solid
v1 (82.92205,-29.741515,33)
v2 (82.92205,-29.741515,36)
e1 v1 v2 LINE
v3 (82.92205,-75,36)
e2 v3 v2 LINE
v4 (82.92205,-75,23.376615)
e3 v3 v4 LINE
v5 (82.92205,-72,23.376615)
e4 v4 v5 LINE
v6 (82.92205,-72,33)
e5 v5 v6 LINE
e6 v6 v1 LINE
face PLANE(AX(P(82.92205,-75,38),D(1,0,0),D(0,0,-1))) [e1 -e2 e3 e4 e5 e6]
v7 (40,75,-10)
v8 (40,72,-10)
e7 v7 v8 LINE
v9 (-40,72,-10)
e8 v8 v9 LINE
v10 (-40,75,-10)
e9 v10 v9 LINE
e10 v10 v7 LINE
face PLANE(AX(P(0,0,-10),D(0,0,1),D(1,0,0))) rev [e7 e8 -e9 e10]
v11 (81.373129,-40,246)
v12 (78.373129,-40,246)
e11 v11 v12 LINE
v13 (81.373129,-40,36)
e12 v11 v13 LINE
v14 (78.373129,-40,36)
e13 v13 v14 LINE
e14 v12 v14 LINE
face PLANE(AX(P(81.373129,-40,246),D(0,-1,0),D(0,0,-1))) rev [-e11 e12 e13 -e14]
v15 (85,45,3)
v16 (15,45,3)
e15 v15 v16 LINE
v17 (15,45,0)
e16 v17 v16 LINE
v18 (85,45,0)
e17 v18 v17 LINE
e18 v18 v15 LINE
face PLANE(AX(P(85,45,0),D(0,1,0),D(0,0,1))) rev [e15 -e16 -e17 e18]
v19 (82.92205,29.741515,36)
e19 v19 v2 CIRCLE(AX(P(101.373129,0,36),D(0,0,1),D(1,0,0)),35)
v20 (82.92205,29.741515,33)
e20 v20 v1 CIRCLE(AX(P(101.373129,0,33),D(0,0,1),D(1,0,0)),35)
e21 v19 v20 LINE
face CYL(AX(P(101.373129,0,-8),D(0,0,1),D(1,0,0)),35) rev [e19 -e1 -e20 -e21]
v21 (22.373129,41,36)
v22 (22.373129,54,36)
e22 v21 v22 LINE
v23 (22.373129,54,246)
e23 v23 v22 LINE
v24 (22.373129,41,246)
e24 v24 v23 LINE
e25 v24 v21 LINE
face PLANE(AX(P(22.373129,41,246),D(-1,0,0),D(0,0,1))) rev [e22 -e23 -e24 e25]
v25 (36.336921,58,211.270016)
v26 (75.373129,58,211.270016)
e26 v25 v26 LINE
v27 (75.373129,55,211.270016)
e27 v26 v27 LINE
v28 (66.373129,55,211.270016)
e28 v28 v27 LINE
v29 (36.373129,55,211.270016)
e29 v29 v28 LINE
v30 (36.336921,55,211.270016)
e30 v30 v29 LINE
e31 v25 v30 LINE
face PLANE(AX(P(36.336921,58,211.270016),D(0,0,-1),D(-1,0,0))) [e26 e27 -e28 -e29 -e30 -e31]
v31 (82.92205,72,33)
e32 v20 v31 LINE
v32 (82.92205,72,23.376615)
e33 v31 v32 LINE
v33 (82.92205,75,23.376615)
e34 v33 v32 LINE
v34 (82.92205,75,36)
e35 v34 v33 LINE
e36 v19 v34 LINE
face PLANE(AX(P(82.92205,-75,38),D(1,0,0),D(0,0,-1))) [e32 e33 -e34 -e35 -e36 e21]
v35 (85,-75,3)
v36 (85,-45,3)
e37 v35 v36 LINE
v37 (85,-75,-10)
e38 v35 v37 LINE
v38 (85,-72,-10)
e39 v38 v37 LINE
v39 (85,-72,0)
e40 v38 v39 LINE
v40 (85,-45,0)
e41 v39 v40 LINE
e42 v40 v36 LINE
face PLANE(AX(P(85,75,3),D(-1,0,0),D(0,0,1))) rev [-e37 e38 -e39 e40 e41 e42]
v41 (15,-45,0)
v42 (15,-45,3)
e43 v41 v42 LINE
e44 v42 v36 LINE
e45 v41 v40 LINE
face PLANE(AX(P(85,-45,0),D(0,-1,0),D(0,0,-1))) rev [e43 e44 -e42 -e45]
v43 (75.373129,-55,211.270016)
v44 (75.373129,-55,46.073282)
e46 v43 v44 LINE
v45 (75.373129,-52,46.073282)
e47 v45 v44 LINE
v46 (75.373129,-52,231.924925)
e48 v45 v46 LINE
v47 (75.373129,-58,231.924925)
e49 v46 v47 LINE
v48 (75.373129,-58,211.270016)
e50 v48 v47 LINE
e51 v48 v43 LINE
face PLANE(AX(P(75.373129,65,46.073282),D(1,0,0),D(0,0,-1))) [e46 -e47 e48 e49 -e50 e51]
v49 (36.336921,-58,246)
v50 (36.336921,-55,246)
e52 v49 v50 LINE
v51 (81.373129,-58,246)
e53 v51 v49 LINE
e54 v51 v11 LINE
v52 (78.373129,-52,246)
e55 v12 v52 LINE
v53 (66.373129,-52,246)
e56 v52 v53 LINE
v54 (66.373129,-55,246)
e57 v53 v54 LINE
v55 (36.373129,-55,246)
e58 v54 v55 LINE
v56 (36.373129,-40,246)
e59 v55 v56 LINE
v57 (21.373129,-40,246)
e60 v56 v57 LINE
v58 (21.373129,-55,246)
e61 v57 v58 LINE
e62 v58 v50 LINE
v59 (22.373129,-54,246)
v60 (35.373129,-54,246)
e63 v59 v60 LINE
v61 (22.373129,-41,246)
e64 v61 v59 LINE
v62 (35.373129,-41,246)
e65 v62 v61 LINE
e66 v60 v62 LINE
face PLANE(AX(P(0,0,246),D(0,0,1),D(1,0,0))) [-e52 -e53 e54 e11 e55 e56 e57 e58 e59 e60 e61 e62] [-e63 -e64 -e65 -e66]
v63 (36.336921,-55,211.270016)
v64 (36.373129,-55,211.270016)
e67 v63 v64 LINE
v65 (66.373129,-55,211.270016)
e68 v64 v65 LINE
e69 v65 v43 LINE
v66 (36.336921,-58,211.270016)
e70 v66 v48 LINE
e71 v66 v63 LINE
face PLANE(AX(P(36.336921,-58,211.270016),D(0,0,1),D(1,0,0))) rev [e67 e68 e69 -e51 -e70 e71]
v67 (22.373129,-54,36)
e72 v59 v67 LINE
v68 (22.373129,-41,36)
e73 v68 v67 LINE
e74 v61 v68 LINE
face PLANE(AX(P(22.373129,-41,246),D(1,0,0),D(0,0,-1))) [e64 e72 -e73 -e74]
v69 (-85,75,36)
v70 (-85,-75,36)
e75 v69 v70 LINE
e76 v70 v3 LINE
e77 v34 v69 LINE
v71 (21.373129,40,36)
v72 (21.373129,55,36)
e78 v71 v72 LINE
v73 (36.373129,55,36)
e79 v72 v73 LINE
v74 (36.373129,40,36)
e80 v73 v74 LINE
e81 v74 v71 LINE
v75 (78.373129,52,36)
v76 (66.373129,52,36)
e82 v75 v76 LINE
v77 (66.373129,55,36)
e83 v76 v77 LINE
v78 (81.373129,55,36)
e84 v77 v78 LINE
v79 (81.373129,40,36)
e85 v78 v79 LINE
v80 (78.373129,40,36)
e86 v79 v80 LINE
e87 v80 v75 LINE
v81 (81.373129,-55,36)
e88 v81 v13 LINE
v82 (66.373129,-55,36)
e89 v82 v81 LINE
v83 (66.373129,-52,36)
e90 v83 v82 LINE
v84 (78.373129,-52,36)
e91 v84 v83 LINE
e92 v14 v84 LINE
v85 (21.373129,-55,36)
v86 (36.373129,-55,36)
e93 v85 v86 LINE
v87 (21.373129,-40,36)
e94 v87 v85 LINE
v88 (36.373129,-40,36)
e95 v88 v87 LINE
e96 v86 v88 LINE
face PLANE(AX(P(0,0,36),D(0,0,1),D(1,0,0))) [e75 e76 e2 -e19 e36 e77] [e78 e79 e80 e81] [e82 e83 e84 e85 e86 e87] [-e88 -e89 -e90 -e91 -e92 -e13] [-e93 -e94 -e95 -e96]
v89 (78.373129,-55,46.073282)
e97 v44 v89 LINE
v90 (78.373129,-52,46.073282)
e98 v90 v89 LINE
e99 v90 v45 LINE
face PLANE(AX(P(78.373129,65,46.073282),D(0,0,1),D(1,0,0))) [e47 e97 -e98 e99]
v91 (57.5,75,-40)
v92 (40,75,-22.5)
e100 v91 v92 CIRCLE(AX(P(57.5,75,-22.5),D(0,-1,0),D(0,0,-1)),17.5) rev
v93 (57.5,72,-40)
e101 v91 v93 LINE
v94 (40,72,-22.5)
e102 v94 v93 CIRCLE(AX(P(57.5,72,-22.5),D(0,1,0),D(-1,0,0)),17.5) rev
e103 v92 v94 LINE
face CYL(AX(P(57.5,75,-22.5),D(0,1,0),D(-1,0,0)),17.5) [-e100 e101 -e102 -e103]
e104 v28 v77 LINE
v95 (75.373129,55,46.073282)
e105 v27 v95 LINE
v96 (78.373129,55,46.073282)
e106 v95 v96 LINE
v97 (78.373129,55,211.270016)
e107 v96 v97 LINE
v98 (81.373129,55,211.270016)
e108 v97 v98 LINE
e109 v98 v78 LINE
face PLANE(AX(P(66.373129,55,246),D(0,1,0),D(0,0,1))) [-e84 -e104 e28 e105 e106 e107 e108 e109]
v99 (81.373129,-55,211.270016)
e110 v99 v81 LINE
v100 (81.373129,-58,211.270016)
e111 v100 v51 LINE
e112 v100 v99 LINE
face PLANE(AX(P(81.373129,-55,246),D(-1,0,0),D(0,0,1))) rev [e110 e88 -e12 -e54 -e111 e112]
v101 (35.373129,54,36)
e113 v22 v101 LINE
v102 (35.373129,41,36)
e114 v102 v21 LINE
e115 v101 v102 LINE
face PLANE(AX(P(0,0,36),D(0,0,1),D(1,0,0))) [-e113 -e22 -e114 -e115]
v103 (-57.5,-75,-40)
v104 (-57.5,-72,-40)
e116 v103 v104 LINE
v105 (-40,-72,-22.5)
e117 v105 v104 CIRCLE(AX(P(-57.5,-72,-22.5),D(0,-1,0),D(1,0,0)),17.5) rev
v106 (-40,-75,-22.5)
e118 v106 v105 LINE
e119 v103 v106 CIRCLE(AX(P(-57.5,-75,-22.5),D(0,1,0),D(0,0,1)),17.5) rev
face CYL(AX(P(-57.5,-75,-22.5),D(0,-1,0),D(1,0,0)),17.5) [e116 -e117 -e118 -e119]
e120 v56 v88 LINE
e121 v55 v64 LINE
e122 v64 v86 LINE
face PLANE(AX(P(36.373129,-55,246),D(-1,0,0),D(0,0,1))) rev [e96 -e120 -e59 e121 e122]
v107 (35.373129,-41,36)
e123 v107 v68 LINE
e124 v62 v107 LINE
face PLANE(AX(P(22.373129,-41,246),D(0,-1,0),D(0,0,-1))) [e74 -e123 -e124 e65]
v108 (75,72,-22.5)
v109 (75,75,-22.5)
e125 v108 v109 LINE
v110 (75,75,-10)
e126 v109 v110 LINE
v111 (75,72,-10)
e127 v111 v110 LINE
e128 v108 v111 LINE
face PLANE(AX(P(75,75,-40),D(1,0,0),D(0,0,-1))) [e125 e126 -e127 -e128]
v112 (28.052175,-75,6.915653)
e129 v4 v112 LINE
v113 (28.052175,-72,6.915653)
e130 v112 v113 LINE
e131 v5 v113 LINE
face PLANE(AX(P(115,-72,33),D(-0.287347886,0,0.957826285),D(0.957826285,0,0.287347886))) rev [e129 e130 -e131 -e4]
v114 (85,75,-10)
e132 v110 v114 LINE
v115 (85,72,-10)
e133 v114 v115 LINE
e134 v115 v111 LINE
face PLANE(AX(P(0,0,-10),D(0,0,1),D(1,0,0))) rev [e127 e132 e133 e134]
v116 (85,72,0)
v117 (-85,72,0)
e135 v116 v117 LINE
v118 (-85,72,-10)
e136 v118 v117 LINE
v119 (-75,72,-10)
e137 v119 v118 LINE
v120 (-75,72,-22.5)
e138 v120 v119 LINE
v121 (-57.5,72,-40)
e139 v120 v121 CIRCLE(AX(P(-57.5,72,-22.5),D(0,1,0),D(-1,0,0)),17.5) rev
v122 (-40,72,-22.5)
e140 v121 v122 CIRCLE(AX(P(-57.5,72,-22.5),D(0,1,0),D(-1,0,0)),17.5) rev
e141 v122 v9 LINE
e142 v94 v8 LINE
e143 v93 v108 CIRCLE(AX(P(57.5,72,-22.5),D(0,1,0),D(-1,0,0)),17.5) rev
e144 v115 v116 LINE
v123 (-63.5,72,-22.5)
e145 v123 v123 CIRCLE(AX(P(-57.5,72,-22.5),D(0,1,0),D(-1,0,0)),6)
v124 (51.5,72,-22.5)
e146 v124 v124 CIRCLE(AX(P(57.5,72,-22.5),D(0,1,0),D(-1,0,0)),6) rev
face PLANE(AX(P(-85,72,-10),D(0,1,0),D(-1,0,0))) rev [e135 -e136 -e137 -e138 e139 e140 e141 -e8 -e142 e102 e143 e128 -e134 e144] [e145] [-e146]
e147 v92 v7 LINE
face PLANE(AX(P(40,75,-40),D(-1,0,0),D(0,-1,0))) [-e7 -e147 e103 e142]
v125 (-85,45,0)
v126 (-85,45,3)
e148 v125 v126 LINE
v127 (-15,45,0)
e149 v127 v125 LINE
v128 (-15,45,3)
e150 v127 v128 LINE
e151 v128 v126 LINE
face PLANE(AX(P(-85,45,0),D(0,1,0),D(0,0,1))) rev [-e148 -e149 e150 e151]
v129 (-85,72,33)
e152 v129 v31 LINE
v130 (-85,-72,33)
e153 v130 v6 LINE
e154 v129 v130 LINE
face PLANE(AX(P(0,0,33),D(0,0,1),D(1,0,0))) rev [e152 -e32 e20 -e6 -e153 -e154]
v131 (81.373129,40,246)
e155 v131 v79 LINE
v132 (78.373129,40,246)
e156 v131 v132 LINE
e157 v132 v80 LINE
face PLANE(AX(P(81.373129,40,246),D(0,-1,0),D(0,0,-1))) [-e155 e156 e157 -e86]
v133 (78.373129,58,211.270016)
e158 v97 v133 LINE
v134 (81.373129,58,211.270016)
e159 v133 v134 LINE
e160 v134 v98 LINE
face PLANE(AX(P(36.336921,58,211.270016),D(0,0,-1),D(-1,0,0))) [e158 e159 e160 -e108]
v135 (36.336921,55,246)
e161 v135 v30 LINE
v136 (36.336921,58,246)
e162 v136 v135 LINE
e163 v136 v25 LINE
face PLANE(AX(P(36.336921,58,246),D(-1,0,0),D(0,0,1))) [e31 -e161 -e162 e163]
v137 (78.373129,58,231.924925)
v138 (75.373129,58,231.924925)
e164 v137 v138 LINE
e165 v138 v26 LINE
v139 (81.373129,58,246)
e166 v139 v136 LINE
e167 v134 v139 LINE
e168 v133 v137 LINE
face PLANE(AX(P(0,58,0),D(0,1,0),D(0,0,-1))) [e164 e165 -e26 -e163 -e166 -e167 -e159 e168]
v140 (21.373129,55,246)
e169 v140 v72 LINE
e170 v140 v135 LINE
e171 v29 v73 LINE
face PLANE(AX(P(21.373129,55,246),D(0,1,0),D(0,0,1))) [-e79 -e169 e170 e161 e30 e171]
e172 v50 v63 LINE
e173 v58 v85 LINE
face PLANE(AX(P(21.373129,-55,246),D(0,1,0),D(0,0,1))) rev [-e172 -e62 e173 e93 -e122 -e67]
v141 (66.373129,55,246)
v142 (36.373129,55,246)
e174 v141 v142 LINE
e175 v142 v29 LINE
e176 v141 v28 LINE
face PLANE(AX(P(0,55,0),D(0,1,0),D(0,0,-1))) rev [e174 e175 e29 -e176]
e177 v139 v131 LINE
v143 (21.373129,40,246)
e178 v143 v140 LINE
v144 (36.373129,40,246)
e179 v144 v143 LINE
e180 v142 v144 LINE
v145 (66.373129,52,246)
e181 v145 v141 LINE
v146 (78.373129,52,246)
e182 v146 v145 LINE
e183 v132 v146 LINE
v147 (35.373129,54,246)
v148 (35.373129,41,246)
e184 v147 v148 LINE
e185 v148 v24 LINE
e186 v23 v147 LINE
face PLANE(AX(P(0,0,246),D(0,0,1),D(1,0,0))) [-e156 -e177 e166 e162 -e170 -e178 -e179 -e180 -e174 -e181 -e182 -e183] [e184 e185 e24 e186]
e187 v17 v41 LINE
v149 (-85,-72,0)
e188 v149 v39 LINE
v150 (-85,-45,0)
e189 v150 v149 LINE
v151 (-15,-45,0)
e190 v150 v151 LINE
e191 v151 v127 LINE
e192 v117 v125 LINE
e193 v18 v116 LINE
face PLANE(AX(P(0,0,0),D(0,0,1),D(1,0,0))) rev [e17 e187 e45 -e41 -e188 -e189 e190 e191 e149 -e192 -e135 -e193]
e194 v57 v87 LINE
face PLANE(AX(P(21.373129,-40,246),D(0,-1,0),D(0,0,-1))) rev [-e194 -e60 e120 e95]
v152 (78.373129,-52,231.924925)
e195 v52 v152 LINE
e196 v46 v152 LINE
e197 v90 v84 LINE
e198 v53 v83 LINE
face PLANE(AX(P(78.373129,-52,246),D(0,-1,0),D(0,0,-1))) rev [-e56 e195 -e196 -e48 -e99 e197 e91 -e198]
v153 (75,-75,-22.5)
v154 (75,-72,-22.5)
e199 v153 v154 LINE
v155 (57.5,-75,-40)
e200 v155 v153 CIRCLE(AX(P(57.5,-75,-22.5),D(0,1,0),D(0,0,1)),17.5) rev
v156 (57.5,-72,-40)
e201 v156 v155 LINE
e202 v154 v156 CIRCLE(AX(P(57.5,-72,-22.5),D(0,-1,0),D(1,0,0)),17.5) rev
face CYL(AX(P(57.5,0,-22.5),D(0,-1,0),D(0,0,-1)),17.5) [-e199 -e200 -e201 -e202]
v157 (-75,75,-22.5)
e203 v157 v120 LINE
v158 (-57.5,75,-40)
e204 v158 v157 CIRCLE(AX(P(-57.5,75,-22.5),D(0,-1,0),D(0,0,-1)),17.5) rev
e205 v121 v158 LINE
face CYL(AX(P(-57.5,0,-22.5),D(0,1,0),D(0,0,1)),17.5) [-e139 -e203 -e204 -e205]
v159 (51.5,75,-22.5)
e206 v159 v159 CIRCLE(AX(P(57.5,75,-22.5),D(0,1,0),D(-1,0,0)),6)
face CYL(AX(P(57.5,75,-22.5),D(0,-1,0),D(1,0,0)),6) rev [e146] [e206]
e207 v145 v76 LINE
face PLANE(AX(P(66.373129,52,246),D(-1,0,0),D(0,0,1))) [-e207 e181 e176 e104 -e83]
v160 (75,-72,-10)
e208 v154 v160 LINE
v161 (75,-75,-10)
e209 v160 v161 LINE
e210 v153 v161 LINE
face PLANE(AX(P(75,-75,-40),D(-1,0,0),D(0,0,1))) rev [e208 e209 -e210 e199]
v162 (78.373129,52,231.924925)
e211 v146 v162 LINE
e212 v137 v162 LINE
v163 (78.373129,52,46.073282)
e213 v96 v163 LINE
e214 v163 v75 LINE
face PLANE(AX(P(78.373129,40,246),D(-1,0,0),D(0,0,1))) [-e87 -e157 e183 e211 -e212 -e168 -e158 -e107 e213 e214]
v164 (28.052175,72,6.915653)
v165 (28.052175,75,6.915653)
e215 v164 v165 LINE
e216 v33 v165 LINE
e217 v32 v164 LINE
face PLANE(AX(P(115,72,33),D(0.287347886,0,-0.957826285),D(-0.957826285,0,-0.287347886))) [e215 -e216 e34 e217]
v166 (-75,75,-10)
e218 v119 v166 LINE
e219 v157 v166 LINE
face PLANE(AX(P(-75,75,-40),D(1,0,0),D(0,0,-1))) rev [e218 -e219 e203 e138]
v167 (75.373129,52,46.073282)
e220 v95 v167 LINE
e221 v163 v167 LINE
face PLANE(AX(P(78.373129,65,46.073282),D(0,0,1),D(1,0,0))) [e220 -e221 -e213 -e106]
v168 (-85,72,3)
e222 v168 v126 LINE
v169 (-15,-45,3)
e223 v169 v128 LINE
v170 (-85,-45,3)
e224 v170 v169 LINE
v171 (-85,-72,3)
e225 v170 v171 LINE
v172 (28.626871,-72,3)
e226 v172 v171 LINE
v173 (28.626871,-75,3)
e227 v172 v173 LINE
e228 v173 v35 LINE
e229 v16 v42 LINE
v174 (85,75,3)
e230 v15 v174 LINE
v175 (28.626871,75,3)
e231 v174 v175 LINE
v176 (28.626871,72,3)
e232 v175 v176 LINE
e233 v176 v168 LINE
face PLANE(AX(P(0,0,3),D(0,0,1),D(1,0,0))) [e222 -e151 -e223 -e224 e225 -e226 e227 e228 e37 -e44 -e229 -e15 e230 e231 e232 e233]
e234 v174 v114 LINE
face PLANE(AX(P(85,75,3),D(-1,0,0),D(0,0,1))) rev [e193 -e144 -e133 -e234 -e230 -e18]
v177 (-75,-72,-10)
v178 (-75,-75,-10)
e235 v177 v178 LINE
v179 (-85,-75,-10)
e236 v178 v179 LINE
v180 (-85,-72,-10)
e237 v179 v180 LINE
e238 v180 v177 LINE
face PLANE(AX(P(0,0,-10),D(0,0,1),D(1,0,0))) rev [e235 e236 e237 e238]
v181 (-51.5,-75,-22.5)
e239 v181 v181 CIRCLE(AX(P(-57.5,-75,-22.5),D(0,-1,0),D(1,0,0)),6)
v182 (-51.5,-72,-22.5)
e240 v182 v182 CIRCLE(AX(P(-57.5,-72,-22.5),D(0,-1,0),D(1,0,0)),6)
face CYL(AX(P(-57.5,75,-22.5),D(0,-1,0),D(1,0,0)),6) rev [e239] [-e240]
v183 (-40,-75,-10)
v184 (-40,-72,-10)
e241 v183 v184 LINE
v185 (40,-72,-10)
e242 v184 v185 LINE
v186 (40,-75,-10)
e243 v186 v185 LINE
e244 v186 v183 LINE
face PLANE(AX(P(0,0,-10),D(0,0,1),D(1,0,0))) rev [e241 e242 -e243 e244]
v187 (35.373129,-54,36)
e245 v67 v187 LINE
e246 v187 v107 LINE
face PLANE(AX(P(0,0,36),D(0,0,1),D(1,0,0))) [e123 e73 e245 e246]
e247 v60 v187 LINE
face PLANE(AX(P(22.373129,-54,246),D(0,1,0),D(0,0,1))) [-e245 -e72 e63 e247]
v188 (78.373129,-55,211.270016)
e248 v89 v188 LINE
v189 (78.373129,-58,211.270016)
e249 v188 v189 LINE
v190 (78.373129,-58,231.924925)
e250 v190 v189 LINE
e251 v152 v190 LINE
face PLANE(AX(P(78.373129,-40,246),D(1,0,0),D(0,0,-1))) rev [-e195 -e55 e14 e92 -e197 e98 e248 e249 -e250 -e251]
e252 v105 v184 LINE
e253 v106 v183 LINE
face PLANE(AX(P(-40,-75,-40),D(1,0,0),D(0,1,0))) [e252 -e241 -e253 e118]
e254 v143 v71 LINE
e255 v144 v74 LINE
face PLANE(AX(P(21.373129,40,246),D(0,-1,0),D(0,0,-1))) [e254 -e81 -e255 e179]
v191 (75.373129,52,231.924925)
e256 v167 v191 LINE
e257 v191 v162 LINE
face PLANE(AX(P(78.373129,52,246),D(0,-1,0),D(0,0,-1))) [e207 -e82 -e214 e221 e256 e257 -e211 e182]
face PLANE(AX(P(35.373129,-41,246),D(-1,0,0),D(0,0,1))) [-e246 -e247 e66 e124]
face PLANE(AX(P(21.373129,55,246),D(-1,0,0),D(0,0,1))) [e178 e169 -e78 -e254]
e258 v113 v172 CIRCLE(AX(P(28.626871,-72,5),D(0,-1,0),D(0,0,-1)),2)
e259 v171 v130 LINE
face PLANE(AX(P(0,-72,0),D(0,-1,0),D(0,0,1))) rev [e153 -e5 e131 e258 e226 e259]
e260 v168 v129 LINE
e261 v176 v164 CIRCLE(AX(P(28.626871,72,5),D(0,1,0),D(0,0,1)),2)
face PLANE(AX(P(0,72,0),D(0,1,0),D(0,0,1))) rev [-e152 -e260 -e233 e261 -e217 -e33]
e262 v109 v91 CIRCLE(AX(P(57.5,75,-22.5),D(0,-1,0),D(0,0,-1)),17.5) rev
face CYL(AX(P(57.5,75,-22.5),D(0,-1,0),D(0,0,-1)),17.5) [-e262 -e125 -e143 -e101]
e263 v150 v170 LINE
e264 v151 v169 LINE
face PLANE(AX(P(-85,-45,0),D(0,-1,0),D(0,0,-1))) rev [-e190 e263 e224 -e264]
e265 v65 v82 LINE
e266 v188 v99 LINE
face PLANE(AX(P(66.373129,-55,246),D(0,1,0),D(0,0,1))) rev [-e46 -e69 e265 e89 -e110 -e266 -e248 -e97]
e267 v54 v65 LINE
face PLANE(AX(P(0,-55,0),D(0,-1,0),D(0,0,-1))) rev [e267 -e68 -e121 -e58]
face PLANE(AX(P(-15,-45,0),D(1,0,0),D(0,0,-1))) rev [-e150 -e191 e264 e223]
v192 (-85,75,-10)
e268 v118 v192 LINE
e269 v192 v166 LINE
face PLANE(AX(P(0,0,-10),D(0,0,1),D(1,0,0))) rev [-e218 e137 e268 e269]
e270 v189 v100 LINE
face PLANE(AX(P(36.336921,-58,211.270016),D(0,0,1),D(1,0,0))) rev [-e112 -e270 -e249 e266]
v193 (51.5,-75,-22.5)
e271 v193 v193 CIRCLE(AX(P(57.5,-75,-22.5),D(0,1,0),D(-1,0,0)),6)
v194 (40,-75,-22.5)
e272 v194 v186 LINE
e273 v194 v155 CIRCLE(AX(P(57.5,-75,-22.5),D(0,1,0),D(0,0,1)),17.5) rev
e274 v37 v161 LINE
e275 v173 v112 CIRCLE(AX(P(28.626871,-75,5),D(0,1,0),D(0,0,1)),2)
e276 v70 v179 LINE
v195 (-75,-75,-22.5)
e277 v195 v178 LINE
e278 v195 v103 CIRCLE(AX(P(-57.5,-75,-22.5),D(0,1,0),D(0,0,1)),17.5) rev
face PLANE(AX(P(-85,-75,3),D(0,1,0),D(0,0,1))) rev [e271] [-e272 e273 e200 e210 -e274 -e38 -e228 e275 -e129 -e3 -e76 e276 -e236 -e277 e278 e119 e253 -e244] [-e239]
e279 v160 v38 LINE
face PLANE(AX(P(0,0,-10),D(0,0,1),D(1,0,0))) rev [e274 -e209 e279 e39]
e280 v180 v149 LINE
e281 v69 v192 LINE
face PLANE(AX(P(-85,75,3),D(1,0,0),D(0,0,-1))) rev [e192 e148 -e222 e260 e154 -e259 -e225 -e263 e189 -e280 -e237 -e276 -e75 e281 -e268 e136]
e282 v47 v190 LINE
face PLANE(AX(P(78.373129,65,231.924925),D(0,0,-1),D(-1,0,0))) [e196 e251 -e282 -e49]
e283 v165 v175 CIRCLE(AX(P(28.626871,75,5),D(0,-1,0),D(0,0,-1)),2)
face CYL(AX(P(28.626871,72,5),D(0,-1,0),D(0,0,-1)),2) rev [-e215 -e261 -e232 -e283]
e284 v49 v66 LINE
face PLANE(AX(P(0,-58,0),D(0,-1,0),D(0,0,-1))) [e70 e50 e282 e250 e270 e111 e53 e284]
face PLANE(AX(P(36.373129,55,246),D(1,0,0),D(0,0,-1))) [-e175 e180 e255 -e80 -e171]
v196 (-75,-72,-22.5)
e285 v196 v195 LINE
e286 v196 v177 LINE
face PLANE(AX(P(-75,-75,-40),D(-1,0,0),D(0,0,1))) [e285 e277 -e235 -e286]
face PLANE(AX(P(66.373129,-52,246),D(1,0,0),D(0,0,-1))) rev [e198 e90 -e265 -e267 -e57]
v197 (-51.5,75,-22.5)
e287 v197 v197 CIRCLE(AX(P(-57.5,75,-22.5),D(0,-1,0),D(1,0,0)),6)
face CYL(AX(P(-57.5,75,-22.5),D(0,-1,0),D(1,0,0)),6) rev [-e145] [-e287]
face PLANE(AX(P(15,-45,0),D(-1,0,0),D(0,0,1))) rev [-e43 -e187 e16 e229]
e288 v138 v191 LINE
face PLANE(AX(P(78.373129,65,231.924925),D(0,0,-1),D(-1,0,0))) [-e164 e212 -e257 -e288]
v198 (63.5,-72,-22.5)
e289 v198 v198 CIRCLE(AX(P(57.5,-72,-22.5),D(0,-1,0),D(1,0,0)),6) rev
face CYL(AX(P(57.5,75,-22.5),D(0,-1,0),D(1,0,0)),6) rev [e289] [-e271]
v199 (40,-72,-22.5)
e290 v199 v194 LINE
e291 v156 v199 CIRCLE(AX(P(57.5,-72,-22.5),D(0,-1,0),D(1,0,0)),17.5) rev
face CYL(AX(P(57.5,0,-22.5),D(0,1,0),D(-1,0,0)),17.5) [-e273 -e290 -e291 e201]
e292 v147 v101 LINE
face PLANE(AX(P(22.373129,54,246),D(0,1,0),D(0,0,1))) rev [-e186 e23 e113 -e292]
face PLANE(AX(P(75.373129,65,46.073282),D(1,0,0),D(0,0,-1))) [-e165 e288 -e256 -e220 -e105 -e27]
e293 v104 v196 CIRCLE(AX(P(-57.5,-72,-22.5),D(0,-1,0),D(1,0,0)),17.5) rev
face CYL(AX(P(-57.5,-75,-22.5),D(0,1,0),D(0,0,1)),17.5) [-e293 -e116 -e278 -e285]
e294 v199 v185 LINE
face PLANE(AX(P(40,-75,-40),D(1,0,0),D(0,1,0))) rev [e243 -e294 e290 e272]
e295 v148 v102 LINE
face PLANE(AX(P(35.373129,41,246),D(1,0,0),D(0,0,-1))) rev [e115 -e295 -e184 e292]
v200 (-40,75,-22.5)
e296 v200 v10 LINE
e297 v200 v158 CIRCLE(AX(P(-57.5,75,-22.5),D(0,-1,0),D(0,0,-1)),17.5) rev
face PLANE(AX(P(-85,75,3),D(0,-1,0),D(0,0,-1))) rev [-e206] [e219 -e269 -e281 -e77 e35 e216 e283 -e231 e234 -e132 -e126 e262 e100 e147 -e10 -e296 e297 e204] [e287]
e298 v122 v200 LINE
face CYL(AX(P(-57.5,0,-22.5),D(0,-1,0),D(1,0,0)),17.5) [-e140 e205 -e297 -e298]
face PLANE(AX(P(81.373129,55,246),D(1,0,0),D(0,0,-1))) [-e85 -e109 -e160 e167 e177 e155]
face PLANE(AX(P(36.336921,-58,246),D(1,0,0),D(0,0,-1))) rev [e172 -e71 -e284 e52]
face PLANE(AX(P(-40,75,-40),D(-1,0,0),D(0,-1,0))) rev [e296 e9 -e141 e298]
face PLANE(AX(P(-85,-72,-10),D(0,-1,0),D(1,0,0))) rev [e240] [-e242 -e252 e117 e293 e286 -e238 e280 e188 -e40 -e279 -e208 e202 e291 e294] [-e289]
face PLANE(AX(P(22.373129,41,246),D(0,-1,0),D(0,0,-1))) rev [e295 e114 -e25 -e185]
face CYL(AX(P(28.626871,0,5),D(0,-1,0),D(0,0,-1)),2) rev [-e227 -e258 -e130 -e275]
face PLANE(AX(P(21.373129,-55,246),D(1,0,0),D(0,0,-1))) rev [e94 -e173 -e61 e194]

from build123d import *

# Parameters (mm, degrees)
SKETCH1_W               = 170
SKETCH1_H               = 150
BOSS_EXTRUDE1_DEPTH     = 3
SKETCH2_W               = 170
SKETCH2_H               = 3
BOSS_EXTRUDE3_DEPTH     = 10
SKETCH3_W               = 35
SKETCH3_H               = 3
BOSS_EXTRUDE4_DEPTH     = 30
FILLET1_R               = 17.5
FILLET1_OF_MIRROR2_R    = 17.5
MIRROR3_START           = -75
MIRROR3_DEPTH           = 3
SKETCH7_W               = 70
SKETCH7_H               = 90
CUT_EXTRUDE1_DEPTH      = 3
SKETCH12_R              = 6
CUT_EXTRUDE2_DEPTH      = 175.453432182
BOSS_EXTRUDE5_DEPTH     = 3
FILLET2_R               = 2
FILLET3_R               = 2
FILLET2_OF_MIRROR5_R    = 2
FILLET3_OF_MIRROR5_R    = 2
SKETCH13_W              = 186.373128994
SKETCH13_H              = 150
BOSS_EXTRUDE6_DEPTH     = 3
SKETCH14_W              = 15
SKETCH14_H              = 15
SKETCH14_W_2            = 13
SKETCH14_H_2            = 13
BOSS_EXTRUDE8_DEPTH     = 210
SKETCH16_W              = 45.036207967
SKETCH16_H              = 34.729984481
BOSS_EXTRUDE9_DEPTH     = 3
CUT_EXTRUDE3_DEPTH      = 10
CUT_EXTRUDE3_DEPTH_BACK = 150
SKETCH17_W              = 3
SKETCH17_H              = 185.851643629
SKETCH18_R              = 35
CUT_EXTRUDE4_DEPTH      = 44
CUT_EXTRUDE6_DEPTH      = 2
CUT_EXTRUDE6_DEPTH_BACK = 17
SKETCH19_W              = 29.178069821
SKETCH19_H              = 150


# Read off the part's stored shape, not the designer's step: Mirror3
with BuildPart() as part:
    # Sketch1 → Boss-Extrude1 (new body)
    with BuildSketch(Plane.XY):
        Rectangle(SKETCH1_W, SKETCH1_H)
    extrude(amount=BOSS_EXTRUDE1_DEPTH)

    # Sketch2 → Boss-Extrude3 (add)
    with BuildSketch(Plane(origin=(0, 0, 0), x_dir=(-1, 0, 0), z_dir=(0, 0, -1))):
        with Locations((0, 73.5)):
            Rectangle(SKETCH2_W, SKETCH2_H)
        with Locations((0, -73.5)):
            Rectangle(SKETCH2_W, SKETCH2_H)
    extrude(amount=BOSS_EXTRUDE3_DEPTH)

    # Sketch3 → Boss-Extrude4 (add)
    with BuildSketch(Plane(origin=(0, 0, -10), x_dir=(-1, 0, 0), z_dir=(0, 0, -1))):
        with Locations((57.5, 73.5)):
            Rectangle(SKETCH3_W, SKETCH3_H)
    boss_extrude4 = extrude(amount=BOSS_EXTRUDE4_DEPTH)

    # Fillet1
    fillet1_edges = [part.edges().sort_by_distance(p)[0] for p in [
        (-40, 73.5, -40),
        (-75, 73.5, -40),
    ]]
    fillet(fillet1_edges, radius=FILLET1_R - 0.0001)  # a hair under: the kernel refuses the full size

    # Mirror2: Boss-Extrude4 across plane
    add(boss_extrude4.mirror(Plane(origin=(0, 0, 0), x_dir=(0, 0, 1), z_dir=(1, 0, 0))))

    # Fillet1 of Mirror2
    fillet1_of_mirror2_edges = [part.edges().sort_by_distance(p)[0] for p in [
        (40, 73.5, -40),
        (75, 73.5, -40),
    ]]
    fillet(fillet1_of_mirror2_edges, radius=FILLET1_OF_MIRROR2_R - 0.0001)  # a hair under: the kernel refuses the full size

    # Mirror3 outline → Mirror3 (add)
    with BuildSketch(Plane(origin=(0, 0, 0), x_dir=(1, 0, 0), z_dir=(0, 1, 0)).offset(MIRROR3_START)):
        with BuildLine():
            ThreePointArc((-57.5, 40), (-69.874368671, 34.874368671), (-75, 22.5))
            Line((-75, 22.5), (-75, 10))
            Line((-75, 10), (-40, 10))
            Line((-40, 10), (-40, 22.5))
            ThreePointArc((-40, 22.5), (-45.125631329, 34.874368671), (-57.5, 40))
        make_face()
        with BuildLine():
            Line((40, 22.5), (40, 10))
            Line((40, 10), (75, 10))
            Line((75, 10), (75, 22.5))
            ThreePointArc((75, 22.5), (69.874368671, 34.874368671), (57.5, 40))
            ThreePointArc((57.5, 40), (45.125631329, 34.874368671), (40, 22.5))
        make_face()
    extrude(amount=MIRROR3_DEPTH)

    # Sketch7 → Cut-Extrude1 (cut)
    with BuildSketch(Plane.XY.offset(3)):
        with Locations((-50, 0)):
            Rectangle(SKETCH7_W, SKETCH7_H)
        with Locations((50, 0)):
            Rectangle(SKETCH7_W, SKETCH7_H)
    extrude(amount=-CUT_EXTRUDE1_DEPTH, mode=Mode.SUBTRACT)

    # Sketch12 → Cut-Extrude2 (cut, symmetric)
    with BuildSketch(Plane.XZ.offset(-72)):
        with Locations((-57.5, -22.5)):
            Circle(SKETCH12_R)
    cut_extrude2 = extrude(amount=CUT_EXTRUDE2_DEPTH, both=True, mode=Mode.SUBTRACT)

    # Mirror4: Cut-Extrude2 across plane
    add(cut_extrude2.mirror(Plane(origin=(0, 0, 0), x_dir=(0, 0, 1), z_dir=(1, 0, 0))), mode=Mode.SUBTRACT)

    # Sketch10 → Boss-Extrude5 (add)
    with BuildSketch(Plane(origin=(0, 75, 0), x_dir=(1, 0, 0), z_dir=(0, 1, 0))):
        Polygon((15, -3), (-85, -3), (-85, -33), (115, -33), align=None)
    boss_extrude5 = extrude(amount=-BOSS_EXTRUDE5_DEPTH)

    # Fillet2
    fillet2_edges = [part.edges().sort_by_distance(p)[0] for p in [
        (115, 73.5, 33),
    ]]
    fillet(fillet2_edges, radius=FILLET2_R)

    # Fillet3
    fillet3_edges = [part.edges().sort_by_distance(p)[0] for p in [
        (15, 73.5, 3),
    ]]
    fillet(fillet3_edges, radius=FILLET3_R)

    # Mirror5: Boss-Extrude5 across plane
    add(boss_extrude5.mirror(Plane.ZX))

    # Fillet2 of Mirror5
    fillet2_of_mirror5_edges = [part.edges().sort_by_distance(p)[0] for p in [
        (115, -73.5, 33),
    ]]
    fillet(fillet2_of_mirror5_edges, radius=FILLET2_OF_MIRROR5_R)

    # Fillet3 of Mirror5
    fillet3_of_mirror5_edges = [part.edges().sort_by_distance(p)[0] for p in [
        (15, -73.5, 3),
    ]]
    fillet(fillet3_of_mirror5_edges, radius=FILLET3_OF_MIRROR5_R)

    # Sketch13 → Boss-Extrude6 (add)
    with BuildSketch(Plane.XY.offset(33)):
        with Locations((8.186564497, 0)):
            Rectangle(SKETCH13_W, SKETCH13_H)
    extrude(amount=BOSS_EXTRUDE6_DEPTH)

    # Sketch14 → Boss-Extrude8 (add)
    # profile 1 of 2: a face of its own
    with BuildSketch(Plane.XY.offset(36)):
        with Locations((28.873128994, -47.5)):
            Rectangle(SKETCH14_W, SKETCH14_H)
        with Locations((28.873128994, -47.5)):
            Rectangle(SKETCH14_W_2, SKETCH14_H_2, mode=Mode.SUBTRACT)
    # profile 2 of 2: a face of its own
    with BuildSketch(Plane.XY.offset(36)):
        Polygon((66.373128994, -55), (81.373128994, -55), (81.373128994, -40), (78.373128994, -40), (78.373128994, -52), (66.373128994, -52), align=None)
    boss_extrude8 = extrude(amount=BOSS_EXTRUDE8_DEPTH)

    # Mirror7: Boss-Extrude8 across plane
    add(boss_extrude8.mirror(Plane.ZX))

    # Sketch16 → Boss-Extrude9 (add)
    with BuildSketch(Plane.XZ.offset(55)):
        with Locations((58.855025011, 228.63500776)):
            Rectangle(SKETCH16_W, SKETCH16_H)
    boss_extrude9 = extrude(amount=BOSS_EXTRUDE9_DEPTH)

    # Mirror8: Boss-Extrude9 across plane
    add(boss_extrude9.mirror(Plane.ZX))

    # Sketch17 → Cut-Extrude3 (cut, two sides: drawn at the far end of the back side and taken through both)
    with BuildSketch(Plane(origin=(0, 55, 0), x_dir=(1, 0, 0), z_dir=(0, 1, 0)).offset(-CUT_EXTRUDE3_DEPTH_BACK)):
        with Locations((76.873128994, -138.999103357)):
            Rectangle(SKETCH17_W, SKETCH17_H)
    extrude(amount=CUT_EXTRUDE3_DEPTH + CUT_EXTRUDE3_DEPTH_BACK, mode=Mode.SUBTRACT)

    # Sketch18 → Cut-Extrude4 (cut)
    with BuildSketch(Plane.XY.offset(36)):
        with Locations((101.373128994, 0)):
            Circle(SKETCH18_R)
    extrude(amount=-CUT_EXTRUDE4_DEPTH, mode=Mode.SUBTRACT)

    # Sketch19 → Cut-Extrude6 (cut, two sides: drawn at the far end of the back side and taken through both)
    with BuildSketch(Plane.XY.offset(36).offset(-CUT_EXTRUDE6_DEPTH_BACK)):
        with Locations((97.511085228, 0)):
            Rectangle(SKETCH19_W, SKETCH19_H)
    extrude(amount=CUT_EXTRUDE6_DEPTH + CUT_EXTRUDE6_DEPTH_BACK, mode=Mode.SUBTRACT)


solid = part.part
